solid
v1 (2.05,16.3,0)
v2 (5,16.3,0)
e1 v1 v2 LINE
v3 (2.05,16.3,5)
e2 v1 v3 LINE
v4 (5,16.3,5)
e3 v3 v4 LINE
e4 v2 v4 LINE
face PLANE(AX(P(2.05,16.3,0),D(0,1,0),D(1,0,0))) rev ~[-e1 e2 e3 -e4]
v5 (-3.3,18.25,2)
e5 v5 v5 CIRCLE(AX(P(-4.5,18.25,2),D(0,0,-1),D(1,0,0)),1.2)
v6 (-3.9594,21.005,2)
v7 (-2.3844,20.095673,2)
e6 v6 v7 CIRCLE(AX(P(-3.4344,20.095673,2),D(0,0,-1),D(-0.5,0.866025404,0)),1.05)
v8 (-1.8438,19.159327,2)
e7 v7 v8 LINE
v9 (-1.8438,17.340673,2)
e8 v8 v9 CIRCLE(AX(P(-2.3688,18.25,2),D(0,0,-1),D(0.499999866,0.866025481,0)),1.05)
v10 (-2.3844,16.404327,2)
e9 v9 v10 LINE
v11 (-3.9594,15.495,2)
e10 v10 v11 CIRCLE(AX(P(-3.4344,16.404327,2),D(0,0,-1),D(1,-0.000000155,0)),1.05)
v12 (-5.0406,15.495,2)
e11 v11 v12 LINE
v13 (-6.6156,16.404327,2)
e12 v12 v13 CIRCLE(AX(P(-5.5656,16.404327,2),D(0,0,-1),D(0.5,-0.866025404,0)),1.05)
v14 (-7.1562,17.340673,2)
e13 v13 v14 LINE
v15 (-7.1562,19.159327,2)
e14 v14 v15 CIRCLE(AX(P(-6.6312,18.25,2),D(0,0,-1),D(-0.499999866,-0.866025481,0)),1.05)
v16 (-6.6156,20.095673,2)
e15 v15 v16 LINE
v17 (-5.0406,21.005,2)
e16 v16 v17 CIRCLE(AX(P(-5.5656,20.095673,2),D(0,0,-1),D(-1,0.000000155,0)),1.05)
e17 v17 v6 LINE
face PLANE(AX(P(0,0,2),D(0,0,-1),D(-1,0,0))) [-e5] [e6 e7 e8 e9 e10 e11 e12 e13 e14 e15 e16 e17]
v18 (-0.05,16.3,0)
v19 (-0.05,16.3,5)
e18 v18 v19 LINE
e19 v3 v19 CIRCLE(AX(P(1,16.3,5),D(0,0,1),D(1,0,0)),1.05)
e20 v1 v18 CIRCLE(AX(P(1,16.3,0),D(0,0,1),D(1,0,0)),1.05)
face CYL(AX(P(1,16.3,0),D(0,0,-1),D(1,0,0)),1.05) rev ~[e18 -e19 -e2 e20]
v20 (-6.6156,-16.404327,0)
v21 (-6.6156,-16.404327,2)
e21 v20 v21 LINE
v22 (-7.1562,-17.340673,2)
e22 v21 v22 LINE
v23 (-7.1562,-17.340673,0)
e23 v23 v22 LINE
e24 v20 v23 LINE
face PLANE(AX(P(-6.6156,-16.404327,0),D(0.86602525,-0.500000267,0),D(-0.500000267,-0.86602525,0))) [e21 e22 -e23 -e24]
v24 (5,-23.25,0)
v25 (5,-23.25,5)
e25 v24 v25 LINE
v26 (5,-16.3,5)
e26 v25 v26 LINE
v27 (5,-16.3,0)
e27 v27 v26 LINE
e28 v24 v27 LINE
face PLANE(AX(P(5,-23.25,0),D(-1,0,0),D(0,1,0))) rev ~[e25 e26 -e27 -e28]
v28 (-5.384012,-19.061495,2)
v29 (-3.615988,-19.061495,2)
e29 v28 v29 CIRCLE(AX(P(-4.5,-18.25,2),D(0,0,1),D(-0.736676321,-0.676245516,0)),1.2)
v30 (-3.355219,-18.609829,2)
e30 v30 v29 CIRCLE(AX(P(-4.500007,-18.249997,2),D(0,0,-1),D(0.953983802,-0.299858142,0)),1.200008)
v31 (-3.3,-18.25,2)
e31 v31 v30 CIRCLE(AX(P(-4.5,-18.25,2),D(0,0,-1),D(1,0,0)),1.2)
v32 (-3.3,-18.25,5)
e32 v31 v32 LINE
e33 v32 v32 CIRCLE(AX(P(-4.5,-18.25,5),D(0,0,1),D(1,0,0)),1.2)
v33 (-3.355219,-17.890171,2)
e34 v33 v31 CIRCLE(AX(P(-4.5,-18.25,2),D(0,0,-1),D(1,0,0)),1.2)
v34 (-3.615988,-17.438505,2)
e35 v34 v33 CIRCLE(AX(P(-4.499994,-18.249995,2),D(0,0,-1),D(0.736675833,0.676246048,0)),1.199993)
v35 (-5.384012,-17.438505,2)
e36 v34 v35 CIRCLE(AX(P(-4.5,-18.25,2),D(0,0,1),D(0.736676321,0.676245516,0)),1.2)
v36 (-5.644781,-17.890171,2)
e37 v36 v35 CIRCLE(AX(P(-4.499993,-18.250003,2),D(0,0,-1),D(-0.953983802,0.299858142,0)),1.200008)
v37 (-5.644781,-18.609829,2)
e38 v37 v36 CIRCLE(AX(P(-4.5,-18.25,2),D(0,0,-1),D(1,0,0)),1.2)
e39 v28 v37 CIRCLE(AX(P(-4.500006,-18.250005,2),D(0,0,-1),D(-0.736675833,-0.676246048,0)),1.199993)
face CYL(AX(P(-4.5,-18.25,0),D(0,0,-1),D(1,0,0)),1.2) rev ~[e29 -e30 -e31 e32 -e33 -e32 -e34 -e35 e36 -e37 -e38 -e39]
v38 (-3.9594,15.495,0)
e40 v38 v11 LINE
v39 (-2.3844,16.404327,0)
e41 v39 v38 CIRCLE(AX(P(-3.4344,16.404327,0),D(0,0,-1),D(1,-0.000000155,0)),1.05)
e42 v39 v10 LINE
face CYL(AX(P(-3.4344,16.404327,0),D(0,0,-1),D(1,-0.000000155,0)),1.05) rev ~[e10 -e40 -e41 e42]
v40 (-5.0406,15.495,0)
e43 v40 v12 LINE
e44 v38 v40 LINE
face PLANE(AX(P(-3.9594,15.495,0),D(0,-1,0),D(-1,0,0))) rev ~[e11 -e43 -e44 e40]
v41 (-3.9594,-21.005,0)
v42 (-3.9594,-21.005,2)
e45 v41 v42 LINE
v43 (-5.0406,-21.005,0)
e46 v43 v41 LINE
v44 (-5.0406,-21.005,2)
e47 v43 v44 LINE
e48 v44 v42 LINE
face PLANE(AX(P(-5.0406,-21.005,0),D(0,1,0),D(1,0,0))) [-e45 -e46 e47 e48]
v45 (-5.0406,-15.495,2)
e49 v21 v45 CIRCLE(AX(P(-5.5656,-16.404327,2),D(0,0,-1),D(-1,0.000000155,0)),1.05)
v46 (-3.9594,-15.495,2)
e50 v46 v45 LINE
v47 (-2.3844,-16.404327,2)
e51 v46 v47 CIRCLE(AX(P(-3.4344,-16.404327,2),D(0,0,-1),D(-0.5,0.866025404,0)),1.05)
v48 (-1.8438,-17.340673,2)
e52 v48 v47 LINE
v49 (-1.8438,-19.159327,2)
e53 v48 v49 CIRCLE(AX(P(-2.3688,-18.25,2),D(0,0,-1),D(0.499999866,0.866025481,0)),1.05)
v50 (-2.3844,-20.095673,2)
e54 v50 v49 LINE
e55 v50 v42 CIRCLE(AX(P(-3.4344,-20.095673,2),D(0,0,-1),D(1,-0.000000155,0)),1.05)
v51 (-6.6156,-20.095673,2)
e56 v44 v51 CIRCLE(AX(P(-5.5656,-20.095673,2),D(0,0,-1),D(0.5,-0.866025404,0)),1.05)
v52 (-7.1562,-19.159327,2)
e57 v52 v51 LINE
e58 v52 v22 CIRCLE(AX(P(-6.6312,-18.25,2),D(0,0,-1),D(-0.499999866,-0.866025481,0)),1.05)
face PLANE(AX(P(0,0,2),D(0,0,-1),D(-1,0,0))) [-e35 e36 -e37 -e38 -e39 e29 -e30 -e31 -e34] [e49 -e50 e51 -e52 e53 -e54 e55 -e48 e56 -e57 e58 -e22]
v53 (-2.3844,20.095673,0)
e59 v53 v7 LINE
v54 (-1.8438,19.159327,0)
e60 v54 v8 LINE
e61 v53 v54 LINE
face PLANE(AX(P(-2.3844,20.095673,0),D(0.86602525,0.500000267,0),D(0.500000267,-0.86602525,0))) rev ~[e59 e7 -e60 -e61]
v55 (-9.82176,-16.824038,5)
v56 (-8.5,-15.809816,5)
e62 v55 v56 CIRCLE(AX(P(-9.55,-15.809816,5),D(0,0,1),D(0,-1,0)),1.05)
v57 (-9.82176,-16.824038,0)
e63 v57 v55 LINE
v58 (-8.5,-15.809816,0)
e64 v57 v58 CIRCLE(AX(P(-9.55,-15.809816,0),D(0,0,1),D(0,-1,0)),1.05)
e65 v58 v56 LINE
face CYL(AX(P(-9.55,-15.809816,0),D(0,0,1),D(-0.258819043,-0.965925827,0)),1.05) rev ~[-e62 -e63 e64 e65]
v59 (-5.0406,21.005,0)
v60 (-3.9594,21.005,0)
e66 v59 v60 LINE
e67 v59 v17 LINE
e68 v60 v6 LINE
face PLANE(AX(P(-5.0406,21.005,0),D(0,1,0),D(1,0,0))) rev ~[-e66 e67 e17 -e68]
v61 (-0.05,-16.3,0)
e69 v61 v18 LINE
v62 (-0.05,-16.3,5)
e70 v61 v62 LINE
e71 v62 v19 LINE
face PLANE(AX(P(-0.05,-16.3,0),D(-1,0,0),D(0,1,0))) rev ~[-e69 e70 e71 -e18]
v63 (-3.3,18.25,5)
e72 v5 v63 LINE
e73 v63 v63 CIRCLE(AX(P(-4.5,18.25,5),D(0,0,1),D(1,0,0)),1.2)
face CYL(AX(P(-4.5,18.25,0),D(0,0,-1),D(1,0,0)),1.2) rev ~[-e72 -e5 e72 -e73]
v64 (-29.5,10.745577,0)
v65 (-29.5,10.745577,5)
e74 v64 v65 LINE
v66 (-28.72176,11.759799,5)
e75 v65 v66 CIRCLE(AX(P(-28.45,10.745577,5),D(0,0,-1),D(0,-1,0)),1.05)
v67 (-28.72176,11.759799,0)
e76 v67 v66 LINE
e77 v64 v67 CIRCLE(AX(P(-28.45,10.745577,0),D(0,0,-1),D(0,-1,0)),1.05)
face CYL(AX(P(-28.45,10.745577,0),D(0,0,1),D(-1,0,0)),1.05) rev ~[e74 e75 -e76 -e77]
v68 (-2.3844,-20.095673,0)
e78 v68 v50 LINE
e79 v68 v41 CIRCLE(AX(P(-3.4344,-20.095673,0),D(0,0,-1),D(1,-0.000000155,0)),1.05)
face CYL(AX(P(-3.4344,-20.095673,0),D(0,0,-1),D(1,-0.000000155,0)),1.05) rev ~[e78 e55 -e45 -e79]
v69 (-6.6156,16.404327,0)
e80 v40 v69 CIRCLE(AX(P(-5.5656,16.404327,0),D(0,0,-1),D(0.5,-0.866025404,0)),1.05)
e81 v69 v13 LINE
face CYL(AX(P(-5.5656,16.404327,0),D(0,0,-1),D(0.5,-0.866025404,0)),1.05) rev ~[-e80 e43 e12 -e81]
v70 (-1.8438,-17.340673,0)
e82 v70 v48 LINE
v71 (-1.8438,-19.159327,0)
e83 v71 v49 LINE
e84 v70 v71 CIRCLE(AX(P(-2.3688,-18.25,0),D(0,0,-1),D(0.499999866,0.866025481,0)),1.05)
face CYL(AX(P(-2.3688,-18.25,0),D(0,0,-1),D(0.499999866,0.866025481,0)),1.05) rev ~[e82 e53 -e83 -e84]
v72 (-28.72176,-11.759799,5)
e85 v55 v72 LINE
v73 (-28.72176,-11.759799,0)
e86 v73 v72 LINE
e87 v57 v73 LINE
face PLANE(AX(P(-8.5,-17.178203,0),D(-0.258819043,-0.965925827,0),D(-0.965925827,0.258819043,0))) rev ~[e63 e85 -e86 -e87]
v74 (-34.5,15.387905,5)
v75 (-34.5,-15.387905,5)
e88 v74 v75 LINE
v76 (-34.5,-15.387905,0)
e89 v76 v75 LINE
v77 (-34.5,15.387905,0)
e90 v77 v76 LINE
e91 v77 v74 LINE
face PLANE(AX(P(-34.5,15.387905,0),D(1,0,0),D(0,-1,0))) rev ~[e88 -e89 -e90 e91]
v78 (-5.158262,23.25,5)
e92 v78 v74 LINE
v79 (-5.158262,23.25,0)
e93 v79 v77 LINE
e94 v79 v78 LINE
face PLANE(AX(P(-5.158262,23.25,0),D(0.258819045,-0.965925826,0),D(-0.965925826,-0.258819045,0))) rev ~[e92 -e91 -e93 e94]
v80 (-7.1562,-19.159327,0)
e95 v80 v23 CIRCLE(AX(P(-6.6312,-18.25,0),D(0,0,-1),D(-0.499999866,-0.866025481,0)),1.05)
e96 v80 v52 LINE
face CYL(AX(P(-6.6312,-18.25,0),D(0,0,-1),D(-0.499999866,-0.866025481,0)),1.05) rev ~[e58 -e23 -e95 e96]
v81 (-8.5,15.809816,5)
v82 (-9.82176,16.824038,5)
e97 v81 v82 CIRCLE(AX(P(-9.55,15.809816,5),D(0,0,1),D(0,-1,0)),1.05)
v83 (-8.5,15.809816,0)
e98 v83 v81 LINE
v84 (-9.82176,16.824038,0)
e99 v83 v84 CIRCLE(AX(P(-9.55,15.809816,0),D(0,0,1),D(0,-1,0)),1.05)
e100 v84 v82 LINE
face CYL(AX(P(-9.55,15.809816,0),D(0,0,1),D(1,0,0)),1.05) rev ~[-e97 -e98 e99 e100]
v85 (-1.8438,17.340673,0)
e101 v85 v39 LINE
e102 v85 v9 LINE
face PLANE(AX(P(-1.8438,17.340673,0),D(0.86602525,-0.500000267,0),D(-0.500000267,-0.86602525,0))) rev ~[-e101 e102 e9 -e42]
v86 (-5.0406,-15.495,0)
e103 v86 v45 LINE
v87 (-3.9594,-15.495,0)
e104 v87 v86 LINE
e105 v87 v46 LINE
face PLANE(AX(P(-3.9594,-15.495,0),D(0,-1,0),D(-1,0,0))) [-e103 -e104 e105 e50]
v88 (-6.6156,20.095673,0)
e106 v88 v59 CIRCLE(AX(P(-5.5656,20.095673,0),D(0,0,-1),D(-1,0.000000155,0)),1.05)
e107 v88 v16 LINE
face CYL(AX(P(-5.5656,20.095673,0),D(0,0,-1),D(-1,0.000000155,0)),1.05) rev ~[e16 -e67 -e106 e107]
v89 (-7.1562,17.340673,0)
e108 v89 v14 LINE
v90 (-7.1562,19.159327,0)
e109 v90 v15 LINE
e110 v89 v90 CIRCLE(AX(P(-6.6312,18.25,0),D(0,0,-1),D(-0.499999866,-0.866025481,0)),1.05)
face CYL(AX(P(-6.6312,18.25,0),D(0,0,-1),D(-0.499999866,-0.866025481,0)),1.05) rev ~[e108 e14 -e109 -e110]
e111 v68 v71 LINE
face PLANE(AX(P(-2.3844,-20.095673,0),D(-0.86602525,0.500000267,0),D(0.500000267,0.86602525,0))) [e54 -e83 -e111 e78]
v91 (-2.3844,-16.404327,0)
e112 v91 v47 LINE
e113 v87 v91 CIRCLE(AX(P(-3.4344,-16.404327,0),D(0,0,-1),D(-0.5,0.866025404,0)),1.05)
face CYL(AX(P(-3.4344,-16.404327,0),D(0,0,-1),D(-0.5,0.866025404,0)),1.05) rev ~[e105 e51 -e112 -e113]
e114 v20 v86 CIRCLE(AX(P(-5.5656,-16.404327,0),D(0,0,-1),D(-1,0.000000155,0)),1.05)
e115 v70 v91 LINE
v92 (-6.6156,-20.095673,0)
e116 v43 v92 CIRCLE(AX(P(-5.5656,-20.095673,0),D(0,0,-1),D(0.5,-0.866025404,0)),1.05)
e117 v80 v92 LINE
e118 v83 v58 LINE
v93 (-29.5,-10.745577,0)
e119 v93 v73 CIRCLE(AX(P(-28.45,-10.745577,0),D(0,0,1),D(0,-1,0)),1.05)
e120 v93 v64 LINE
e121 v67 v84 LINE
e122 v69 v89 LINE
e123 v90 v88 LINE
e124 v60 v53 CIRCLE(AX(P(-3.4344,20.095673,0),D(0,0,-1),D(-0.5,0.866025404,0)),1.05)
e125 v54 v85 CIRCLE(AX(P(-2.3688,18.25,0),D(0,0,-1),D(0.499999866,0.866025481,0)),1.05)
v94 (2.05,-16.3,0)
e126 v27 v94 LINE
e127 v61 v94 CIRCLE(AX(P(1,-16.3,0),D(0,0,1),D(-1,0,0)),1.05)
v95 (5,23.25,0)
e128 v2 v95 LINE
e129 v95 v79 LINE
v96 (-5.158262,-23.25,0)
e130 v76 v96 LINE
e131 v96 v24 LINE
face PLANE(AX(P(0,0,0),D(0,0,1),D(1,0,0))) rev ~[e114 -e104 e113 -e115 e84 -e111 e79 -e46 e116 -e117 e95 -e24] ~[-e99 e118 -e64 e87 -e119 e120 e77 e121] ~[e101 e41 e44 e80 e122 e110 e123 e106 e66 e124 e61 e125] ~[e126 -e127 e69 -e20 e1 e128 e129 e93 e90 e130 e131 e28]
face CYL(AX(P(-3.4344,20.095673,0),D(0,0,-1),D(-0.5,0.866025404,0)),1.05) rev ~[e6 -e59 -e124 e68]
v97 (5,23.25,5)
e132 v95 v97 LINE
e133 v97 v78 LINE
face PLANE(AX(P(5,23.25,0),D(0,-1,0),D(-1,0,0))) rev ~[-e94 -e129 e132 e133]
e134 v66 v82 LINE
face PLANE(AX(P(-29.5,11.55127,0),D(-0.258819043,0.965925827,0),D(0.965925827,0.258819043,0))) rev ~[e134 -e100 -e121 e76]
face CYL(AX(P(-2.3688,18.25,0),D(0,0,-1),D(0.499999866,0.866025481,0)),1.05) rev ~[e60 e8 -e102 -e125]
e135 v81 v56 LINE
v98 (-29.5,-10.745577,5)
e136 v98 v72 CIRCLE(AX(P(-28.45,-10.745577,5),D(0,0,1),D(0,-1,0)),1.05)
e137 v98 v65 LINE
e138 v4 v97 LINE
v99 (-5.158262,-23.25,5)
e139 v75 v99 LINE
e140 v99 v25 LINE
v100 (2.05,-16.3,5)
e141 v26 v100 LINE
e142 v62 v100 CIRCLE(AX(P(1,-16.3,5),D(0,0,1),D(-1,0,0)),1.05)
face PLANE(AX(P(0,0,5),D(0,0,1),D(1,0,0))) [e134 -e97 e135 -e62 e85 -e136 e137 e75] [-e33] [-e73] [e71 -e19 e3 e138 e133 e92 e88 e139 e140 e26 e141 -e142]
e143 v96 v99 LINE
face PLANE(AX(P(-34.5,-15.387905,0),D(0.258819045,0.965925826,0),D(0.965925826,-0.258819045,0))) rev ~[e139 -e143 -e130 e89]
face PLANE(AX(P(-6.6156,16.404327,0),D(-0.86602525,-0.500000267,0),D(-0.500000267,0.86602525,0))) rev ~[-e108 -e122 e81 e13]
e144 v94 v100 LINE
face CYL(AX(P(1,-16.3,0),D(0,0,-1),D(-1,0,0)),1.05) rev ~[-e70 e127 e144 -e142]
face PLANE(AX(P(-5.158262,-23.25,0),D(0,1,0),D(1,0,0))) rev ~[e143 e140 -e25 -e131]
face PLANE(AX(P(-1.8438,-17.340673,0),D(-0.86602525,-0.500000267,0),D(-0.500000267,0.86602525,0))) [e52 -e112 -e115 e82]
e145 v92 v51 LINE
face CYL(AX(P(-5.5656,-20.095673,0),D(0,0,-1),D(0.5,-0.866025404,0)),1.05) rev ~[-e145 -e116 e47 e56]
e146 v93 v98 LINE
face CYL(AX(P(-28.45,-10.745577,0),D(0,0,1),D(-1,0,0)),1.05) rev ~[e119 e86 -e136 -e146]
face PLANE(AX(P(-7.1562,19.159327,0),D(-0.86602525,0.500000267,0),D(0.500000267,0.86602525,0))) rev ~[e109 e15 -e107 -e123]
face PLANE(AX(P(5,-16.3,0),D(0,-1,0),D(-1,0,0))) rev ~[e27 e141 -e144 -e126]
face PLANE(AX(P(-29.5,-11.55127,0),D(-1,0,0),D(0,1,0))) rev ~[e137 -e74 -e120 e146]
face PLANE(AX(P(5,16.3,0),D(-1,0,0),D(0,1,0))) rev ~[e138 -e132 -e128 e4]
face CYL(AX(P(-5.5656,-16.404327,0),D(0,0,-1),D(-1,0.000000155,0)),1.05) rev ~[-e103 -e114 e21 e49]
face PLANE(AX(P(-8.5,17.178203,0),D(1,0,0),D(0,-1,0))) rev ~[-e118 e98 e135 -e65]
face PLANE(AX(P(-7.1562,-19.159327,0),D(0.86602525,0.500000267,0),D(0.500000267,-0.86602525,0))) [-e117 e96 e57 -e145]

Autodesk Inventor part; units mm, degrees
ref_plane "YZ Plane" through (0, 0, 0) normal (1, 0, 0) x (0, 1, 0)
ref_plane "XZ Plane" through (0, 0, 0) normal (0, 1, 0) x (-1, 0, 0)
ref_plane "XY Plane" through (0, 0, 0) normal (0, 0, 1) x (1, 0, 0)
sketch "スケッチ1" plane through (0, 0, 0) normal (0, 0, 1) x (1, 0, 0)
  line L0 (0, 16.25) -> (28.465632, 16.25) construction
  line L1 (28.465632, 16.25) -> (28.465632, -16.25) construction
  line L2 (28.465632, -16.25) -> (0, -16.25) construction
  line L3 (0, -16.25) -> (0, 16.25) construction
  line L4 (5, 23.25) -> (-5.158262, 23.25)
  line L5 (-5.158262, 23.25) -> (-34.5, 15.387905)
  line L6 (-34.5, 15.387905) -> (-34.5, -15.387905)
  line L7 (-34.5, -15.387905) -> (-5.158262, -23.25)
  line L8 (-5.158262, -23.25) -> (5, -23.25)
  line L9 (5, -23.25) -> (5, -16.3)
  line L10 (5, -16.3) -> (2.05, -16.3)
  arc A0 (-0.05, -16.3) -> (2.05, -16.3) centre (1, -16.3) ccw
  line L11 (-0.05, -16.3) -> (-0.05, 16.3)
  arc A1 (2.05, 16.3) -> (-0.05, 16.3) centre (1, 16.3) ccw
  line L12 (28.465632, 0) -> (0, 0) construction
  line L13 (2.05, 16.3) -> (5, 16.3)
  line L14 (5, 16.3) -> (5, 23.25)
  line L15 (28.515632, 16.3) -> (-0.05, 16.3) construction
  line L16 (-0.05, 16.3) -> (-0.05, -16.3) construction
  line L17 (-0.05, -16.3) -> (28.515632, -16.3) construction
  line L18 (28.515632, -16.3) -> (28.515632, 16.3) construction
  circle A2 centre (-4.5, 18.25) radius 1.2
  circle A3 centre (-4.5, -18.25) radius 1.2
  line L19 (0, 0) -> (28.465632, 0) construction
  line L20 (2.5, 16.25) -> (2.5, -16.25) construction
  circle A4 centre (-4.5, 18.25) radius 5 construction
  line L21 (-6.087713, 15.5) -> (-7.675426, 18.25)
  line L22 (-7.675426, 18.25) -> (-6.087713, 21)
  line L23 (-6.087713, 21) -> (-2.912287, 21)
  line L24 (-2.912287, 21) -> (-1.324574, 18.25)
  line L25 (-1.324574, 18.25) -> (-2.912287, 15.5)
  line L26 (-2.912287, 15.5) -> (-6.087713, 15.5)
  point P0 (-34.5, 0)
  point P1 (-0.05, 0)
  dimension "d98" = 32.5
  dimension "d100" = 0.05
  dimension "d101" = 1.05
  dimension "d102" = 5
  dimension "d104" = 2.4
  dimension "d106" = 2.5
  dimension "d107" = 7
  dimension "d108" = 18.25
  dimension "d109" = 5
  dimension "d110" = 30
  dimension "d111" = 165
  dimension "d130" = 5.5
extrude "押し出し1" add sketch "スケッチ1" along normal blind 5 contours L14 L13 A1 L11 A0 L10 L9 L8 L7 L6 L5 L4 | L21 L22 L23 L24 L25 L26
sketch "スケッチ6" plane through (0, 0, 0) normal (0, 0, -1) x (-1, 0, 0)
  line L0 (34.5, -15.387905) -> (5.158262, -23.25)
  line L1 (34.5, 15.387905) -> (34.5, -15.387905)
  line L2 (5.158262, 23.25) -> (34.5, 15.387905)
  line L3 (8.5, 17.178203) -> (8.5, -17.178203)
  line L4 (8.5, -17.178203) -> (29.5, -11.55127)
  line L5 (29.5, -11.55127) -> (29.5, 11.55127)
  line L6 (29.5, 11.55127) -> (8.5, 17.178203)
  circle A0 centre (4.5, 18.25) radius 1.2
  point P0 (0, 0)
  dimension "d113" = 5
  dimension "d114" = 5
  dimension "d115" = 5
  dimension "d133" = 4
extrude "押し出し4" cut sketch "スケッチ6" against normal blind 5 contours L6 L5 L4 L3
fillet "フィレット2" radius 1.05 4 edges at (-8.5, 17.1782, 2.5) (-8.5, -17.1782, 2.5) (-29.5, 11.5513, 2.5) (-29.5, -11.5513, 2.5)
sketch "スケッチ7" plane through (0, 0, 0) normal (0, 0, -1) x (-1, 0, 0)
  circle A0 centre (4.5, -18.25) radius 1.2
  circle A1 centre (4.5, 18.25) radius 1.2
  line L0 (2.912287, 15.5) -> (1.324574, 18.25)
  line L1 (1.324574, 18.25) -> (2.912287, 21)
  line L2 (2.912287, 21) -> (6.087713, 21)
  line L3 (6.087713, 21) -> (7.675426, 18.25)
  line L4 (7.675426, 18.25) -> (6.087713, 15.5)
  line L5 (6.087713, 15.5) -> (2.912287, 15.5)
  line L6 (7.6812, 18.25) -> (6.0906, 21.005)
  line L7 (6.0906, 21.005) -> (2.9094, 21.005)
  line L8 (2.9094, 21.005) -> (1.3188, 18.25)
  line L9 (1.3188, 18.25) -> (2.9094, 15.495)
  line L10 (2.9094, 15.495) -> (6.0906, 15.495)
  line L11 (6.0906, 15.495) -> (7.6812, 18.25)
  circle A2 centre (6.6312, 18.25) radius 1.05
  circle A3 centre (5.5656, 20.095673) radius 1.05
  circle A4 centre (3.4344, 20.095673) radius 1.05
  circle A5 centre (2.3688, 18.25) radius 1.05
  circle A6 centre (3.4344, 16.404327) radius 1.05
  circle A7 centre (5.5656, 16.404327) radius 1.05
  line L12 (7.6812, -18.25) -> (6.0906, -21.005)
  line L13 (6.0906, -21.005) -> (2.9094, -21.005)
  line L14 (2.9094, -21.005) -> (1.3188, -18.25)
  line L15 (1.3188, -18.25) -> (2.9094, -15.495)
  line L16 (2.9094, -15.495) -> (6.0906, -15.495)
  line L17 (6.0906, -15.495) -> (7.6812, -18.25)
  circle A8 centre (6.6312, -18.25) radius 1.05
  circle A9 centre (5.5656, -16.404327) radius 1.05
  circle A10 centre (3.4344, -16.404327) radius 1.05
  circle A11 centre (2.3688, -18.25) radius 1.05
  circle A12 centre (3.4344, -20.095673) radius 1.05
  circle A13 centre (5.5656, -20.095673) radius 1.05
  point P0 (0, 0)
  point P1 (6.0906, 21.005)
  point P2 (2.9094, 21.005)
  point P3 (1.3188, 18.25)
  point P4 (2.9094, 15.495)
  point P5 (6.0906, 15.495)
  point P6 (2.9094, -15.495)
  point P7 (2.9094, -21.005)
  point P8 (6.0906, -21.005)
  dimension "d121" = 2.1
  dimension "d119" = 5.5
  dimension "d120" = 0.005
  dimension "d124" = 360
  dimension "d128" = 360
sketch "スケッチ7 outline for 押し出し5" plane through (0, 0, 0) normal (0, 0, -1) x (-1, 0, 0)
  arc A0 (6.6156, 20.095673) -> (5.0406, 21.005) centre (5.5656, 20.095673) ccw
  line L0 (5.0406, 21.005) -> (3.9594, 21.005)
  arc A1 (3.9594, 21.005) -> (2.3844, 20.095673) centre (3.4344, 20.095673) ccw
  line L1 (2.3844, 20.095673) -> (1.8438, 19.159327)
  arc A2 (1.8438, 19.159327) -> (1.8438, 17.340673) centre (2.3688, 18.25) ccw
  line L2 (1.8438, 17.340673) -> (2.3844, 16.404327)
  arc A3 (2.3844, 16.404327) -> (3.9594, 15.495) centre (3.4344, 16.404327) ccw
  line L3 (3.9594, 15.495) -> (5.0406, 15.495)
  arc A4 (5.0406, 15.495) -> (6.6156, 16.404327) centre (5.5656, 16.404327) ccw
  line L4 (6.6156, 16.404327) -> (7.1562, 17.340673)
  arc A5 (7.1562, 17.340673) -> (7.1562, 19.159327) centre (6.6312, 18.25) ccw
  line L5 (7.1562, 19.159327) -> (6.6156, 20.095673)
  arc A6 (6.6156, -16.404327) -> (5.0406, -15.495) centre (5.5656, -16.404327) ccw
  line L6 (3.9594, -15.495) -> (5.0406, -15.495)
  arc A7 (3.9594, -15.495) -> (2.3844, -16.404327) centre (3.4344, -16.404327) ccw
  line L7 (1.8438, -17.340673) -> (2.3844, -16.404327)
  arc A8 (1.8438, -17.340673) -> (1.8438, -19.159327) centre (2.3688, -18.25) ccw
  line L8 (2.3844, -20.095673) -> (1.8438, -19.159327)
  arc A9 (2.3844, -20.095673) -> (3.9594, -21.005) centre (3.4344, -20.095673) ccw
  line L9 (5.0406, -21.005) -> (3.9594, -21.005)
  arc A10 (5.0406, -21.005) -> (6.6156, -20.095673) centre (5.5656, -20.095673) ccw
  line L10 (7.1562, -19.159327) -> (6.6156, -20.095673)
  arc A11 (7.1562, -19.159327) -> (7.1562, -17.340673) centre (6.6312, -18.25) ccw
  line L11 (6.6156, -16.404327) -> (7.1562, -17.340673)
  arc A12 (5.644781, -17.890171) -> (5.384012, -17.438505) centre (4.5, -18.25) ccw
  arc A13 (5.644781, -17.890171) -> (5.644781, -18.609829) centre (6.6312, -18.25) ccw
  arc A14 (5.384012, -19.061495) -> (5.644781, -18.609829) centre (4.5, -18.25) ccw
  arc A15 (5.384012, -19.061495) -> (4.760769, -19.421324) centre (5.5656, -20.095673) ccw
  arc A16 (4.239231, -19.421324) -> (4.760769, -19.421324) centre (4.5, -18.25) ccw
  arc A17 (4.239231, -19.421324) -> (3.615988, -19.061495) centre (3.4344, -20.095673) ccw
  arc A18 (3.355219, -18.609829) -> (3.615988, -19.061495) centre (4.5, -18.25) ccw
  arc A19 (3.355219, -18.609829) -> (3.355219, -17.890171) centre (2.3688, -18.25) ccw
  arc A20 (3.615988, -17.438505) -> (3.355219, -17.890171) centre (4.5, -18.25) ccw
  arc A21 (3.615988, -17.438505) -> (4.239231, -17.078676) centre (3.4344, -16.404327) ccw
  arc A22 (4.760769, -17.078676) -> (4.239231, -17.078676) centre (4.5, -18.25) ccw
  arc A23 (4.760769, -17.078676) -> (5.384012, -17.438505) centre (5.5656, -16.404327) ccw
extrude "押し出し5" cut sketch "スケッチ7 outline for 押し出し5" against normal blind 2
sketch "スケッチ8" plane through (0, 0, 5) normal (0, 0, 1) x (1, 0, 0)
  point P0 (0, 0)
equation "\"d114\" = d113"
equation "\"d115\" = d113"
properties part number "バンパ-" material "アセタール樹脂、黒"
